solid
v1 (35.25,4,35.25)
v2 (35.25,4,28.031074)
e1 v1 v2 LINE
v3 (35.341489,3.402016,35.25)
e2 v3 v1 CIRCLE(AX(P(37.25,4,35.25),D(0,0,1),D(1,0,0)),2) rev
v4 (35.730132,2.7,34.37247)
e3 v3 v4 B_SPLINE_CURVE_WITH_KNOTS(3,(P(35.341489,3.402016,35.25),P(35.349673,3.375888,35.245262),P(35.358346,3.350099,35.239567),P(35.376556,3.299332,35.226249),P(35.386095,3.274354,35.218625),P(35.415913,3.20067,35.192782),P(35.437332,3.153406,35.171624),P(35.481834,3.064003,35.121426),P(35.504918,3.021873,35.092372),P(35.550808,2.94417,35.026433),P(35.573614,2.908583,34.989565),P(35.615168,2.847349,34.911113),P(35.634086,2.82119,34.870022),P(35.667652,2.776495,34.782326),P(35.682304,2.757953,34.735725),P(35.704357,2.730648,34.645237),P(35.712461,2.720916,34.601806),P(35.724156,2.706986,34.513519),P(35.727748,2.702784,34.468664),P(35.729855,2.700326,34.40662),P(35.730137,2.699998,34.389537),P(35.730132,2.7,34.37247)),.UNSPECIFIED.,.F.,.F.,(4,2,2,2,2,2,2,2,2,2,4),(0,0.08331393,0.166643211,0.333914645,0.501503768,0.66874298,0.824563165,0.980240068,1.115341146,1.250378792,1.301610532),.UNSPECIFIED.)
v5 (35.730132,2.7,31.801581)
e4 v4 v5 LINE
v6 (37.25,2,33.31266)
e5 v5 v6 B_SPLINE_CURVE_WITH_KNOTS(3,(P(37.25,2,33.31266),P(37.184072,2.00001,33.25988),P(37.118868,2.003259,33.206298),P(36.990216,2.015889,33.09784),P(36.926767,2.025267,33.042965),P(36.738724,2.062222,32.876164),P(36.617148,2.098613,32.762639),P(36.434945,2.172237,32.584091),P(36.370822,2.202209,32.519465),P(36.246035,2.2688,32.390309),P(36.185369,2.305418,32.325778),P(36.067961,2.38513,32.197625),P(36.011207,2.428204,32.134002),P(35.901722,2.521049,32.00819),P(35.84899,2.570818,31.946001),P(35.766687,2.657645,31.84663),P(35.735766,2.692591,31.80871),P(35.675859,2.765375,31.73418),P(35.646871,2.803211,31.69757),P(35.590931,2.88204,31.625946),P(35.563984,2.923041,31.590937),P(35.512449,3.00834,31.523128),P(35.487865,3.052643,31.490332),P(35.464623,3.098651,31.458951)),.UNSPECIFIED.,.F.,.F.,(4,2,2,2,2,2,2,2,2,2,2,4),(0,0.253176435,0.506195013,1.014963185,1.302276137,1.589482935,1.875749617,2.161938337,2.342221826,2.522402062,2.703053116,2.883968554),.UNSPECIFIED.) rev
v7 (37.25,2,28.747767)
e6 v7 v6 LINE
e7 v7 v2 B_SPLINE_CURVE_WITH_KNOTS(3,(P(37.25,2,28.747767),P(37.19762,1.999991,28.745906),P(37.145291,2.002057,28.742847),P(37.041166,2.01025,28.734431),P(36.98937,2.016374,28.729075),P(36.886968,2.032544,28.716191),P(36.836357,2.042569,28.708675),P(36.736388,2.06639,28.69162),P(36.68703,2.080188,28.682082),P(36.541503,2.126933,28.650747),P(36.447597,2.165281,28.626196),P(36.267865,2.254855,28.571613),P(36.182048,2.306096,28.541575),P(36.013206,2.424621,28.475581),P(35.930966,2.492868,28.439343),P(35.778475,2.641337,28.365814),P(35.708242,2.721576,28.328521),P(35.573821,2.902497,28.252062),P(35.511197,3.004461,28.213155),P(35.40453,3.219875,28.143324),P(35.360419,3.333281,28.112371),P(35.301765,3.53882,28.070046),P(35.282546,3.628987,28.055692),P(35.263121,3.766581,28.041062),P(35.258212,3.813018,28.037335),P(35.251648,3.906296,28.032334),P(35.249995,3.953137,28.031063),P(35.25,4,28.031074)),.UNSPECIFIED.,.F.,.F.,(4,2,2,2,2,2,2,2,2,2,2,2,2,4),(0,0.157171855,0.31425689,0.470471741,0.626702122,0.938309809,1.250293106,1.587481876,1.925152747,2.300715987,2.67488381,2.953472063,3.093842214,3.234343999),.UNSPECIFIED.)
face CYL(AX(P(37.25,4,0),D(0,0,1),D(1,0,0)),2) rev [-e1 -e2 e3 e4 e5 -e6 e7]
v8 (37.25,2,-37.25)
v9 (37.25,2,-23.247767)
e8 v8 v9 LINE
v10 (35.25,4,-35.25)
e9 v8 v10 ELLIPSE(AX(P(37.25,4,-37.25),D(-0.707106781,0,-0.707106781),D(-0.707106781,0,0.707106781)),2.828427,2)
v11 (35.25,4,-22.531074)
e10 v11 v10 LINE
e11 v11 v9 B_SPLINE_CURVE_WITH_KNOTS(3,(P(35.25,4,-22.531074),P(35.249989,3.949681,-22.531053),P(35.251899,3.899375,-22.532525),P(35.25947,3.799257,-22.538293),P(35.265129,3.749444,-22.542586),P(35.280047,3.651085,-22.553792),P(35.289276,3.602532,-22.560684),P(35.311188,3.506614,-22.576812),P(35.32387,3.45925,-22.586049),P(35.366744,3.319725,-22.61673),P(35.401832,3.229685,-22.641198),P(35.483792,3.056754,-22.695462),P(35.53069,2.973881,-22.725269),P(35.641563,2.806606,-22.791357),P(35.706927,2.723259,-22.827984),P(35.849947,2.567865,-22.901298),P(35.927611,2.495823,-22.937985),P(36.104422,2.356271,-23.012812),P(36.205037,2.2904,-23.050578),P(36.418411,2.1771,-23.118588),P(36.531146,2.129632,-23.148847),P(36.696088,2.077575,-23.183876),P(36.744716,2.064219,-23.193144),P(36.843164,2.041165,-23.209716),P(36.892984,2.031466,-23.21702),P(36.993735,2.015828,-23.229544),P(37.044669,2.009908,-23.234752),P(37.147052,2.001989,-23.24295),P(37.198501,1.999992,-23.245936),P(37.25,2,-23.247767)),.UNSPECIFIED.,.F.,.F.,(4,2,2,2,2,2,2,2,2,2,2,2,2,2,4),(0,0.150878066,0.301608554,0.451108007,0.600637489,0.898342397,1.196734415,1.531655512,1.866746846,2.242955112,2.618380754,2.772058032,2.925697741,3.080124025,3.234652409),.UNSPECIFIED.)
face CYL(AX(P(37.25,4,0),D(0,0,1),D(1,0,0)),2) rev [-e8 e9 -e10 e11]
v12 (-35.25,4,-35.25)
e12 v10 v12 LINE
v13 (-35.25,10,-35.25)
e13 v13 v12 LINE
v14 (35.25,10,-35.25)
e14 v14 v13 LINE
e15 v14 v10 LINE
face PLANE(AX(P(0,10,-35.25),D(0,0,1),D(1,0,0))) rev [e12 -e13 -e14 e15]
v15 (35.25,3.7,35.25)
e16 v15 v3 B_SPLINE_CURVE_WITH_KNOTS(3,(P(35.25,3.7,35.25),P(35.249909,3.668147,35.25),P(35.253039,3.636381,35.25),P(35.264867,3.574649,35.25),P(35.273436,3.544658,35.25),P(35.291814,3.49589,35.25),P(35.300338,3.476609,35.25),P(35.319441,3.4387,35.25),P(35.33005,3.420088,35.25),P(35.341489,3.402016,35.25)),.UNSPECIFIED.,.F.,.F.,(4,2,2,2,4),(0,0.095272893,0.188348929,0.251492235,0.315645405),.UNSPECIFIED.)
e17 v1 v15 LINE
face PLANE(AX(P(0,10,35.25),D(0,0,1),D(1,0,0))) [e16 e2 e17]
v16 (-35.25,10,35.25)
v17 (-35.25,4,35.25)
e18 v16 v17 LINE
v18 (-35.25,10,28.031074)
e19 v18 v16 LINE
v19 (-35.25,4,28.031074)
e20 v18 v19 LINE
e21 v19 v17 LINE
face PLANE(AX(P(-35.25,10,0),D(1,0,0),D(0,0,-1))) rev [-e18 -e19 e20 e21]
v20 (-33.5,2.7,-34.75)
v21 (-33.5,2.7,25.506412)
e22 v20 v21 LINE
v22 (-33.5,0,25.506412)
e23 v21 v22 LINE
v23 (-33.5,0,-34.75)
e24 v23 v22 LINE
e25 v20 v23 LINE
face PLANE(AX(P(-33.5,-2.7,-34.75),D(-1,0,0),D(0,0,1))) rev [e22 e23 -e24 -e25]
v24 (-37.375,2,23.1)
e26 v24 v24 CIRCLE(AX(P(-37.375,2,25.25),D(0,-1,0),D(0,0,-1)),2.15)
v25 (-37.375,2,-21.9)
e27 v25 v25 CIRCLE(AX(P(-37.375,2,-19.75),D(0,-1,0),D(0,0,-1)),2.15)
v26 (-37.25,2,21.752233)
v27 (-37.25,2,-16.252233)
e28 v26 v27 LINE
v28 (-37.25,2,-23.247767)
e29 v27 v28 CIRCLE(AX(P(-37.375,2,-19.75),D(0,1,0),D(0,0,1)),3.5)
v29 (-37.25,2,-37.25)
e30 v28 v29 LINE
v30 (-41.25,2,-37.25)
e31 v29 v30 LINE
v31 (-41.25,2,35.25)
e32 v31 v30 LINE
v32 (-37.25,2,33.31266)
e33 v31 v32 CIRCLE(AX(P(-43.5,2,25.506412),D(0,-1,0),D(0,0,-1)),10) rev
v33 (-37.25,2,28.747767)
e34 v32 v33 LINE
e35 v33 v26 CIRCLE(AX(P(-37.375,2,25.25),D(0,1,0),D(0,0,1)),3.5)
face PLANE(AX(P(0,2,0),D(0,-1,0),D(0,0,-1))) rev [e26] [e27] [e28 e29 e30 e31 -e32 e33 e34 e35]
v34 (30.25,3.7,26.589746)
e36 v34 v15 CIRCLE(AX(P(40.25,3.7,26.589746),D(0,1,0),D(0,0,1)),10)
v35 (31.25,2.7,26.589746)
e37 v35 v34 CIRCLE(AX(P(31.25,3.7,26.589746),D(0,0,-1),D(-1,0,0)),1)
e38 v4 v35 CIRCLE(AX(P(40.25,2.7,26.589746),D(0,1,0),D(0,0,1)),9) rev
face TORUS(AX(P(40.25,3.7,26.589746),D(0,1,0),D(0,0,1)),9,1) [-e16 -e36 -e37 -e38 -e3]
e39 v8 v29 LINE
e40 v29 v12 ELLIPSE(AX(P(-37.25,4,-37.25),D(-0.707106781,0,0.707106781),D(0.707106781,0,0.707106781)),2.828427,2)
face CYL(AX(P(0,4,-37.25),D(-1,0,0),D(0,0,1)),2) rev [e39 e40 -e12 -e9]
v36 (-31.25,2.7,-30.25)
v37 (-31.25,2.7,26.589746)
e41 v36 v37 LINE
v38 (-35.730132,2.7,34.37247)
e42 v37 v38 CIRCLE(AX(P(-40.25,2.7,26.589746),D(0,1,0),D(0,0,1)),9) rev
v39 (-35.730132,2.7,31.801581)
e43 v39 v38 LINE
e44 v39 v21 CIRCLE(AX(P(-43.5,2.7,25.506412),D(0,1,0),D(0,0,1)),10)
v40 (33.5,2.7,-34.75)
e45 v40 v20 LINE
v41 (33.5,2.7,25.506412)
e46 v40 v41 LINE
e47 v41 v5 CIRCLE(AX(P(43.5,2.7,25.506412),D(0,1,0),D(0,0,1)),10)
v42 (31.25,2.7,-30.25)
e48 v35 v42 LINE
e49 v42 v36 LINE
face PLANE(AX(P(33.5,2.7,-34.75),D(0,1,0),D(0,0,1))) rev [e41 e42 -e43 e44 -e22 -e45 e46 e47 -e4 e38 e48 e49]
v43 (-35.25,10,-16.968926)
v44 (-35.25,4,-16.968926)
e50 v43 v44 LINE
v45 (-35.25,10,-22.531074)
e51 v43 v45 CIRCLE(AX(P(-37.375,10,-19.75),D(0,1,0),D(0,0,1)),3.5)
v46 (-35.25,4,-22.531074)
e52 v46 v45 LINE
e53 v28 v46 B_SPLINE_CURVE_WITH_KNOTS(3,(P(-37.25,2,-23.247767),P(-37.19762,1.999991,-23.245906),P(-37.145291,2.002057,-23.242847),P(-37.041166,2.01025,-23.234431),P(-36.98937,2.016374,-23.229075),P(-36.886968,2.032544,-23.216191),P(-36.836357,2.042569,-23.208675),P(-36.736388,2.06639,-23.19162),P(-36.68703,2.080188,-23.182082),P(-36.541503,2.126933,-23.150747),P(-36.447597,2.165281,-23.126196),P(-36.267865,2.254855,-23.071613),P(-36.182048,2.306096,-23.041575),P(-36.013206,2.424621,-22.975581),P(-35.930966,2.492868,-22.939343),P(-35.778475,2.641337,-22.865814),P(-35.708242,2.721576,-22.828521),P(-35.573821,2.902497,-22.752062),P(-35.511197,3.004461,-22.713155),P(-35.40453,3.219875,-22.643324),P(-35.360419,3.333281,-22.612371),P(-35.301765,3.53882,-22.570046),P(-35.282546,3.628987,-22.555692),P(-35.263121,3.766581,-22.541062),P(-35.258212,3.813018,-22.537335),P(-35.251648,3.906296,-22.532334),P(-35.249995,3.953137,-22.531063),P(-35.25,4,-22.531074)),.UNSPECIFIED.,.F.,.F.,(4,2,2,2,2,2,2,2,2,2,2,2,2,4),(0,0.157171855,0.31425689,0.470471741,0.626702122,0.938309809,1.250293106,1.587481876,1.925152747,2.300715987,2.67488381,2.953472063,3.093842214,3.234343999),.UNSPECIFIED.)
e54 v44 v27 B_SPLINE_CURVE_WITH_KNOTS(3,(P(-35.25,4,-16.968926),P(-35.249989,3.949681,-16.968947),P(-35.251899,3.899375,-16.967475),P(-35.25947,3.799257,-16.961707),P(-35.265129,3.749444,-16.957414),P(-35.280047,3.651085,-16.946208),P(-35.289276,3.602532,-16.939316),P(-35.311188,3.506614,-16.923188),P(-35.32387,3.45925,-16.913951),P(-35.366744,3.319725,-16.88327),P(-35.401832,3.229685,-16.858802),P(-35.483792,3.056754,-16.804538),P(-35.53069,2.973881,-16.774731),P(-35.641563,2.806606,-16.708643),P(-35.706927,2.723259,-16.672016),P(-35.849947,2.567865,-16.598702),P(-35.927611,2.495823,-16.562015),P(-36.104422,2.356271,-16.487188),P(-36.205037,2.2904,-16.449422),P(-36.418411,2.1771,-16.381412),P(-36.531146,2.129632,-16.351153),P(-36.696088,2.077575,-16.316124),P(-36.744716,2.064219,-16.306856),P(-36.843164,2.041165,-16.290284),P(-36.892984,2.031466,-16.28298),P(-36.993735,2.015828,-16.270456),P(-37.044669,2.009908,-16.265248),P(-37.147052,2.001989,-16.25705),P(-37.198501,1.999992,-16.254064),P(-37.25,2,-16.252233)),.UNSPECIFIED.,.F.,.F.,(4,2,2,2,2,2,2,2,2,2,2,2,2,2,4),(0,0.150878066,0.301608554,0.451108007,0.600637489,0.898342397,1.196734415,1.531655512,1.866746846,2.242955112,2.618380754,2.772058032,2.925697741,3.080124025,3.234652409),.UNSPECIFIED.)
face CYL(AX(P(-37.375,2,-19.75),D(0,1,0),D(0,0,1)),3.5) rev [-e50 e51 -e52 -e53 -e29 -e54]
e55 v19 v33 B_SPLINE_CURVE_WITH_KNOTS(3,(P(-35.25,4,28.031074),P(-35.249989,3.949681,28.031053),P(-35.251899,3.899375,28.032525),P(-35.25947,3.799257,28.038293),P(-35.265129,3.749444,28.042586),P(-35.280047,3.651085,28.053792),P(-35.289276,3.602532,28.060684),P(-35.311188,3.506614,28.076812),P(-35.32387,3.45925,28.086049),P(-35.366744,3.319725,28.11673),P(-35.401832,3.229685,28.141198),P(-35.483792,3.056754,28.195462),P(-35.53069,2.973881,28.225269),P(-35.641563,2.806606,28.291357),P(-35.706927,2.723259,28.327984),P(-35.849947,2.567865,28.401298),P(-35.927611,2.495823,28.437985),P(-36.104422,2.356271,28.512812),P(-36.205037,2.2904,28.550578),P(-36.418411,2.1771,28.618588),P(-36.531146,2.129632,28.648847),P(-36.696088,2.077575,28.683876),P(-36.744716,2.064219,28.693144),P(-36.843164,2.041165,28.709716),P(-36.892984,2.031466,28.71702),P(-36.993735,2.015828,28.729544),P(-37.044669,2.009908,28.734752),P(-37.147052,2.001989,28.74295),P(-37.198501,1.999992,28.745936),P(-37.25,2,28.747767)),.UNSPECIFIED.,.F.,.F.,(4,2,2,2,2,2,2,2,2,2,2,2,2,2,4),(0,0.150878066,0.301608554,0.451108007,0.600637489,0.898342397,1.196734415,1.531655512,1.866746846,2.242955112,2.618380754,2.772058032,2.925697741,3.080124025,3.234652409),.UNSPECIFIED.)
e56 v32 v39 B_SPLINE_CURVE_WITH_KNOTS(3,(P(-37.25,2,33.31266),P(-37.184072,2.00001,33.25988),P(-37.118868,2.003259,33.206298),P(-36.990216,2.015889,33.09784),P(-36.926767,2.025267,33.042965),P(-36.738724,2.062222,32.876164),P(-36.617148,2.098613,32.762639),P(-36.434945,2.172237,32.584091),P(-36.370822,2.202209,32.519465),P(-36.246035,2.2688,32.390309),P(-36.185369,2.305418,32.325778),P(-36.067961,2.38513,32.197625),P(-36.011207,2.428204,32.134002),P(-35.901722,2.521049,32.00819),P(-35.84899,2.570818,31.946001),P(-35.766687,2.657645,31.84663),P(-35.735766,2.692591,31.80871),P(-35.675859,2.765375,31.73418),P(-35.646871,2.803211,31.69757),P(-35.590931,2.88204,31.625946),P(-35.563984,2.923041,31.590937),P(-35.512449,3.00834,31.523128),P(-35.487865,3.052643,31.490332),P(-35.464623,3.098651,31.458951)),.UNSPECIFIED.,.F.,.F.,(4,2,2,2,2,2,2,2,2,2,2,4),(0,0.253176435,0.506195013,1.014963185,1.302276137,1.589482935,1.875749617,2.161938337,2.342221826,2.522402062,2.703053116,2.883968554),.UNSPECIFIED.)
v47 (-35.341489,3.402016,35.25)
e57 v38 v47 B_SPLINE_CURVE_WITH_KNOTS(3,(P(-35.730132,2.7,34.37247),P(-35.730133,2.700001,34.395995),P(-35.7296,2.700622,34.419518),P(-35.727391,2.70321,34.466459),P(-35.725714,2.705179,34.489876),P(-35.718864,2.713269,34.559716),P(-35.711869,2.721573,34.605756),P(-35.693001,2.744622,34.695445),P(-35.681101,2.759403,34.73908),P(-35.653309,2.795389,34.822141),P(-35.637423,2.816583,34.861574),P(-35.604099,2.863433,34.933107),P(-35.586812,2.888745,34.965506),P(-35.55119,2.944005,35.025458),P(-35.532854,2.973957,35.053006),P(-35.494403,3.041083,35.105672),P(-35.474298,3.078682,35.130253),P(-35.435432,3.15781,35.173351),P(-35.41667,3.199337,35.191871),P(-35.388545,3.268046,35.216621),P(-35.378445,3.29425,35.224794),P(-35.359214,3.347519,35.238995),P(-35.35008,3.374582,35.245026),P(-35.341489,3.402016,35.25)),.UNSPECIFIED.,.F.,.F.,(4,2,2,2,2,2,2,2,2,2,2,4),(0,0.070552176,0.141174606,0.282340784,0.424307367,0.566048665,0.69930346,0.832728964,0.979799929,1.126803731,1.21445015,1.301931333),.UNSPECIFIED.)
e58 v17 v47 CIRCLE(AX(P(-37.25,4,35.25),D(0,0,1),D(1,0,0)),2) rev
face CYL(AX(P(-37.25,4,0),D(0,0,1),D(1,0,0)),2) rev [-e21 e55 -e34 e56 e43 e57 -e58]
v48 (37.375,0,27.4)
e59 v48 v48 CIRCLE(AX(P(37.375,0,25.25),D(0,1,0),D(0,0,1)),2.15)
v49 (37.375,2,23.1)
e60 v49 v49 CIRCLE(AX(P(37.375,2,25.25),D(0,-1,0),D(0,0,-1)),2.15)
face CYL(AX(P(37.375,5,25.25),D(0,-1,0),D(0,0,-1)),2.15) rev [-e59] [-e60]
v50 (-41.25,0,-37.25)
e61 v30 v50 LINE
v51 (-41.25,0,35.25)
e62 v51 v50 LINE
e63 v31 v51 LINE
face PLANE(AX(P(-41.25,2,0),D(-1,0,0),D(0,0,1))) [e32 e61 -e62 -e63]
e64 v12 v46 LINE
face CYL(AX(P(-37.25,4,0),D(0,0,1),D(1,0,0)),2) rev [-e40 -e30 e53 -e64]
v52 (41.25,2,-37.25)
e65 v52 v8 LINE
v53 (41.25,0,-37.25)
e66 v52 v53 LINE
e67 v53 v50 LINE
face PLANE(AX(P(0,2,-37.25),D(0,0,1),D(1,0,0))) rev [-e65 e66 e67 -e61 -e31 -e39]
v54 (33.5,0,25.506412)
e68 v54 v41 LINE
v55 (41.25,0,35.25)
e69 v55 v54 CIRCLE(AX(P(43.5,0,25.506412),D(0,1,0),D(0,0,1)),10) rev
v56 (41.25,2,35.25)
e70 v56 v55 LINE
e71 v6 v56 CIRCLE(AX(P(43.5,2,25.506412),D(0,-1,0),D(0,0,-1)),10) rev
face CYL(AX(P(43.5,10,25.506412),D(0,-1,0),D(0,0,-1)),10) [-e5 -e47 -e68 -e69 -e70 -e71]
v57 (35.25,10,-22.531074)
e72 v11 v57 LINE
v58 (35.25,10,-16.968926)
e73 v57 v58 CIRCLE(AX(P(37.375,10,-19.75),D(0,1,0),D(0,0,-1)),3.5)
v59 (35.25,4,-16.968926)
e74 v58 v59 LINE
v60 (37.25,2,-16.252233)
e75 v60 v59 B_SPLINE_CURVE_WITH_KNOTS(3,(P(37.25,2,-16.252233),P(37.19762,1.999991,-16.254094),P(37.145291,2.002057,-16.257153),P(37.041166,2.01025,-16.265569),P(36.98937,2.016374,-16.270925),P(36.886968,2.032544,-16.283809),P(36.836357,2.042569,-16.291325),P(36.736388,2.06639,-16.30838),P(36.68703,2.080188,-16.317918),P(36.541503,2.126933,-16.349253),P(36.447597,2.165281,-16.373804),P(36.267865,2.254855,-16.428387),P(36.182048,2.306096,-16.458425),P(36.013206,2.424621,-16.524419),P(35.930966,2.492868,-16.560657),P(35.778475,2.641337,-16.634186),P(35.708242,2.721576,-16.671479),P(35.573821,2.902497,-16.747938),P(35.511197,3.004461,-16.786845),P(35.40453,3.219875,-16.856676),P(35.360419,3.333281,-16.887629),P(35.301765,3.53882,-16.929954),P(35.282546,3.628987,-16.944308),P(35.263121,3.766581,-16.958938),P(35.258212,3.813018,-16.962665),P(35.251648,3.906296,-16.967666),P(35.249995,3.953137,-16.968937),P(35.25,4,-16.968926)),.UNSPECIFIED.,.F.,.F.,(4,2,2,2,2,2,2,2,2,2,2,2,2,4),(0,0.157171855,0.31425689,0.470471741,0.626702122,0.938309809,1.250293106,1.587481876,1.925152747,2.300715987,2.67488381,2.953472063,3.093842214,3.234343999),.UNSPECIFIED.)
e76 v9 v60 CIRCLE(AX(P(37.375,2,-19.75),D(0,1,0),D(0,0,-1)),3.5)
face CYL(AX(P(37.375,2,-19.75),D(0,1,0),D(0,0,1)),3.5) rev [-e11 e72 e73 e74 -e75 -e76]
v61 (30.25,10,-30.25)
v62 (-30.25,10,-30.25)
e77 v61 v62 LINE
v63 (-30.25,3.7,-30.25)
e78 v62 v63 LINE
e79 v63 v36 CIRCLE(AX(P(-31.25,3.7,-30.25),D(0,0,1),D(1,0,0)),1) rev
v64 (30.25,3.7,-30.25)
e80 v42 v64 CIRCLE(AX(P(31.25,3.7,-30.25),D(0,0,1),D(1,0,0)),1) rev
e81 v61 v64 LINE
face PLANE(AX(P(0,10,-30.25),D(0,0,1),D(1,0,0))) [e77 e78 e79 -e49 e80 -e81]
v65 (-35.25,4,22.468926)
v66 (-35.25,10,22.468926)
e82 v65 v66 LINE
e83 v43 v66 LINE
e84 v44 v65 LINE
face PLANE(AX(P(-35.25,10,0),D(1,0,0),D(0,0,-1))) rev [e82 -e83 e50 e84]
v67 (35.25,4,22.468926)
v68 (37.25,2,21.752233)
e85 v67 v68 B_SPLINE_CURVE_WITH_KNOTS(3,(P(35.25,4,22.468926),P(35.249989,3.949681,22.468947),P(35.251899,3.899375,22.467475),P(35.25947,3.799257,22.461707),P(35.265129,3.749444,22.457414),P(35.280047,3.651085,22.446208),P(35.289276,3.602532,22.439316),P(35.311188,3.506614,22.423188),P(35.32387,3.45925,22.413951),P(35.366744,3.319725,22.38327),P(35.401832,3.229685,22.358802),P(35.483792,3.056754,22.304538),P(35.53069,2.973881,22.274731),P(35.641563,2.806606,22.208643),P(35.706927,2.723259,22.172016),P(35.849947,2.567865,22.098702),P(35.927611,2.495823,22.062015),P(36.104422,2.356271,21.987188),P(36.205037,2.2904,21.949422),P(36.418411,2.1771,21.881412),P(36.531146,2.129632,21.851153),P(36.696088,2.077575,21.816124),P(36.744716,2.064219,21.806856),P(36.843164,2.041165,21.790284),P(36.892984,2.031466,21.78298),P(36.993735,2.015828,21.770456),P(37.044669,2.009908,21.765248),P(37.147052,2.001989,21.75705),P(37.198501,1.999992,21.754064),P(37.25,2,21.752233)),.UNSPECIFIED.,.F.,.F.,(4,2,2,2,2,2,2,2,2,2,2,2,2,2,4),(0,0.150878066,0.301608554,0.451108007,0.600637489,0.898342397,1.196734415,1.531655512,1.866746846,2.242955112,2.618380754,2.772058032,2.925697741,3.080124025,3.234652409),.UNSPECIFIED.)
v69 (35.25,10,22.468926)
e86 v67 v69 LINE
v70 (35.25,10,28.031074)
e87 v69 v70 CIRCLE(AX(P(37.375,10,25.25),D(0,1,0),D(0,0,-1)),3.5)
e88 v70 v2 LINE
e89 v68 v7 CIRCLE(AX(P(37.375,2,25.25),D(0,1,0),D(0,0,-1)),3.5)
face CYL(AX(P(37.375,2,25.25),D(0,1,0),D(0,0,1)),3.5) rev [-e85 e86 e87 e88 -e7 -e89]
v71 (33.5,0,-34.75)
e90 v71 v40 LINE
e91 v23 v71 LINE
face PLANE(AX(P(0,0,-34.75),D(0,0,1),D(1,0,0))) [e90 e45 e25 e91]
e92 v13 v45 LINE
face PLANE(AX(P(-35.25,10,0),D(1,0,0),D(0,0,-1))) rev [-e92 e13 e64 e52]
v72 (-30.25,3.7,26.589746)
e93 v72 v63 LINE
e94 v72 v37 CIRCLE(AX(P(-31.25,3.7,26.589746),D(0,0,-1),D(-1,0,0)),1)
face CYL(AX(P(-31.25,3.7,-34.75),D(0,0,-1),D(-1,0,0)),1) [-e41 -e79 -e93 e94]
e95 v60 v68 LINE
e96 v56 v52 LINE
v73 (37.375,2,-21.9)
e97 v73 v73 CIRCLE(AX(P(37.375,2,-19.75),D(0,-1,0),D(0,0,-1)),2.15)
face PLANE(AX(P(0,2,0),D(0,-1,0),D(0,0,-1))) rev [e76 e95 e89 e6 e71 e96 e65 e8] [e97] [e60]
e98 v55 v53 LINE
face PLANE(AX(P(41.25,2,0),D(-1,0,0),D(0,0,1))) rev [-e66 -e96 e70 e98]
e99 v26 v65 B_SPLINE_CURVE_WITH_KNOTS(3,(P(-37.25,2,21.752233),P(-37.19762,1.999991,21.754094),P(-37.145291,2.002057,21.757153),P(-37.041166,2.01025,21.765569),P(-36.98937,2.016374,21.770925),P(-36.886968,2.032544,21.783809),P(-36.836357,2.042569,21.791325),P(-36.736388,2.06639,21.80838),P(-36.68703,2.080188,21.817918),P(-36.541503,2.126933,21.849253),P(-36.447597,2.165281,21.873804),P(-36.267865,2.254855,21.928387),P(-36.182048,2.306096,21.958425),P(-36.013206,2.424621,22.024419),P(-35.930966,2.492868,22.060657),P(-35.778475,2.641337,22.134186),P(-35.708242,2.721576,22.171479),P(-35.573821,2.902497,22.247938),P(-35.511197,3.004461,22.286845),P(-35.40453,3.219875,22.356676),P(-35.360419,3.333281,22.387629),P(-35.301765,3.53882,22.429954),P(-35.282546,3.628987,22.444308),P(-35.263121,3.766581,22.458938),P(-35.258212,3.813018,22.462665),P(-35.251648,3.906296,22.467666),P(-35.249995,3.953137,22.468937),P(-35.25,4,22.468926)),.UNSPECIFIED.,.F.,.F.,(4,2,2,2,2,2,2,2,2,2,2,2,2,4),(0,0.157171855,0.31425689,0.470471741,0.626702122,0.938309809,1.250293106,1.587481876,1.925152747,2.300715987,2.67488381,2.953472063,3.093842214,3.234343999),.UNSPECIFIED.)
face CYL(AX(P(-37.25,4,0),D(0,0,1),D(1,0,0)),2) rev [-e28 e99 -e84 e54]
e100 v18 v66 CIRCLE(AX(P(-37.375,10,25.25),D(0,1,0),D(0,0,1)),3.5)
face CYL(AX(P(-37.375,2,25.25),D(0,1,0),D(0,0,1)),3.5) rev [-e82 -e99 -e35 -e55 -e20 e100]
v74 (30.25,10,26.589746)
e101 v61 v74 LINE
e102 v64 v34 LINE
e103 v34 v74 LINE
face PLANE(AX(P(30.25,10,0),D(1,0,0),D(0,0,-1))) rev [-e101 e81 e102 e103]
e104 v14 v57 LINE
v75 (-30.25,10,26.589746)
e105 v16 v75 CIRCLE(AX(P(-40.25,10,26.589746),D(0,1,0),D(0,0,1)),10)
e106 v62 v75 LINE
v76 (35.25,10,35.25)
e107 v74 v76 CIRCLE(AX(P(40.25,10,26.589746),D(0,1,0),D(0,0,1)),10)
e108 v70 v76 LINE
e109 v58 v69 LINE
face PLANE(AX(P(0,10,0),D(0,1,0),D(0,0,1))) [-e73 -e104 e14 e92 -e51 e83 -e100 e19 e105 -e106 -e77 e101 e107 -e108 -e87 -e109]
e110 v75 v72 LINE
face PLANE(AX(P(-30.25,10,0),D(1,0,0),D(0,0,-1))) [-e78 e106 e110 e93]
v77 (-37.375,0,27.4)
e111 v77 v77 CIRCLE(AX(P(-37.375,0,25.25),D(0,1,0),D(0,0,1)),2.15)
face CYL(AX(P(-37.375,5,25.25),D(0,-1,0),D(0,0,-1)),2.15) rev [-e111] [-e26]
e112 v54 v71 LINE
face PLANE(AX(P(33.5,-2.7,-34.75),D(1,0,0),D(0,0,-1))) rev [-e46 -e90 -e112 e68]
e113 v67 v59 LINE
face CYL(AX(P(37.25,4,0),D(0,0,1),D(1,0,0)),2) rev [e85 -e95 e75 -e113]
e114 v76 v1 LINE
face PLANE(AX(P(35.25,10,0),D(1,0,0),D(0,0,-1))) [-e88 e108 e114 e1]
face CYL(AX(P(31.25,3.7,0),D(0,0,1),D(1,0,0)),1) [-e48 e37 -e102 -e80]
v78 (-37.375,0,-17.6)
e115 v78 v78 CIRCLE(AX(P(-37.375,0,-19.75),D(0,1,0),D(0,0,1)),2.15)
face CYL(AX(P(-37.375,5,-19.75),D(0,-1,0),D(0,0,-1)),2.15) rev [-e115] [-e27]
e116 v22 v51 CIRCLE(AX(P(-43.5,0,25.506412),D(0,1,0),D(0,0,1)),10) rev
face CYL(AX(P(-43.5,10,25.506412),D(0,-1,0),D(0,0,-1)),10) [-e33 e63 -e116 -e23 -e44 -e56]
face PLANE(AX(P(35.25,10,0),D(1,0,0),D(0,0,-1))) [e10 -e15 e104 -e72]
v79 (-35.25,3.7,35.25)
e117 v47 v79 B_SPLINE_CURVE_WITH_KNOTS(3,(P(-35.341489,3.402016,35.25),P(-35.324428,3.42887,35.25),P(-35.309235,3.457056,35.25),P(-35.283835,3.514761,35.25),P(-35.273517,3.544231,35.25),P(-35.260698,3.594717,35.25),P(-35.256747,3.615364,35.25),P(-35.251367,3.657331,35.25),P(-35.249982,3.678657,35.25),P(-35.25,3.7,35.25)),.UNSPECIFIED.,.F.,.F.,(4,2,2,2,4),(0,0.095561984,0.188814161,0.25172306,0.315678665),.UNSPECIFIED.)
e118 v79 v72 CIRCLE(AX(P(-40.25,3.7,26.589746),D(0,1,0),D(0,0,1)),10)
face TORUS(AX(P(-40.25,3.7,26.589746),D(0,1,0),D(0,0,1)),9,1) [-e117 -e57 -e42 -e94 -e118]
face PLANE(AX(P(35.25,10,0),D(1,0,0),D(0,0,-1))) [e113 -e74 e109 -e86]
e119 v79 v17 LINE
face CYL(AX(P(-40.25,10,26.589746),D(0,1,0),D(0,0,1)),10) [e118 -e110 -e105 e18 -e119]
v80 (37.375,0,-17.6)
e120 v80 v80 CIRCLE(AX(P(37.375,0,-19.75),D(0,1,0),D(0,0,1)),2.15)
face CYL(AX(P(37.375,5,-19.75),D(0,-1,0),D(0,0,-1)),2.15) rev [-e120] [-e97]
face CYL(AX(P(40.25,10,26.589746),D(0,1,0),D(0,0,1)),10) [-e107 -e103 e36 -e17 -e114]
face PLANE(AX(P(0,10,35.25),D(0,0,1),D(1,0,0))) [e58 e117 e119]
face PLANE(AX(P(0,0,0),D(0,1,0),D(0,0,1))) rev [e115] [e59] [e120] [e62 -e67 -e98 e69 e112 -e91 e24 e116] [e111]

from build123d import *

# Parameters (mm, degrees)
SKETCH1_W           = 70.5
SKETCH1_H           = 70.5
SKETCH1_W_2         = 60.5
SKETCH1_H_2         = 60.5
BOSS_EXTRUDE1_DEPTH = 10
SKETCH2_W           = 67
SKETCH2_H           = 5.4
CUT_EXTRUDE1_DEPTH  = 70
BOSS_EXTRUDE3_DEPTH = 2
SKETCH7_W           = 60.5
SKETCH7_H           = 5
CUT_EXTRUDE3_DEPTH  = 25
FILLET2_R           = 2
SKETCH8_W           = 97.382964501
SKETCH8_H           = 35.083557697
CUT_EXTRUDE4_DEPTH  = 2
SKETCH9_R           = 2.15
CUT_EXTRUDE5_DEPTH  = 5
SKETCH10_R          = 3.5
CUT_EXTRUDE6_DEPTH  = 8
FILLET3_R           = 10
FILLET4_R           = 10
FILLET5_R           = 1


# Some blends are built 0.0001 mm under size
with BuildPart() as part:
    # Sketch1 → Boss-Extrude1 (new body)
    with BuildSketch(Plane(origin=(0, 0, 0), x_dir=(1, 0, 0), z_dir=(0, 1, 0))):
        Rectangle(SKETCH1_W, SKETCH1_H)
        Rectangle(SKETCH1_W_2, SKETCH1_H_2, mode=Mode.SUBTRACT)
    extrude(amount=BOSS_EXTRUDE1_DEPTH)

    # Sketch2 → Cut-Extrude1 (cut)
    with BuildSketch(Plane.XY.offset(35.25)):
        Rectangle(SKETCH2_W, SKETCH2_H)
    extrude(amount=-CUT_EXTRUDE1_DEPTH, mode=Mode.SUBTRACT)

    # Sketch6 → Boss-Extrude3 (add)
    with BuildSketch(Plane.XZ):
        Polygon((41.25, -37.25), (41.25, 37.25), (35.25, 37.25), (35.25, 35.25), (35.25, -35.25), (-35.25, -35.25), (-35.25, 35.25), (-35.25, 37.25), (-41.25, 37.25), (-41.25, -37.25), align=None)
    extrude(amount=-BOSS_EXTRUDE3_DEPTH)

    # Sketch7 → Cut-Extrude3 (cut)
    with BuildSketch(Plane.XZ.offset(-2.7)):
        with Locations((0, 32.75)):
            Rectangle(SKETCH7_W, SKETCH7_H)
    extrude(amount=-CUT_EXTRUDE3_DEPTH, mode=Mode.SUBTRACT)

    # Fillet2
    fillet2_edges = [part.edges().sort_by_distance(p)[0] for p in [
        (35.25, 2, 0),
        (-35.25, 2, 0),
        (0, 2, -35.25),
    ]]
    fillet(fillet2_edges, radius=FILLET2_R - 0.0001)  # a hair under: the kernel refuses the full size

    # Sketch8 → Cut-Extrude4 (cut)
    with BuildSketch(Plane.XY.offset(37.25)):
        with Locations((-5.820498703, 2.430952297)):
            Rectangle(SKETCH8_W, SKETCH8_H)
    extrude(amount=-CUT_EXTRUDE4_DEPTH, mode=Mode.SUBTRACT)

    # Sketch9 → Cut-Extrude5 (cut, symmetric)
    with BuildSketch(Plane.XZ):
        with Locations(Location((-37.375, 25.25, 0), (0, 0, 273.333029494))):
            Circle(SKETCH9_R)
        with Locations(Location((-37.375, -19.75, 0), (0, 0, 273.333029494))):
            Circle(SKETCH9_R)
        with Locations(Location((37.375, -19.75, 0), (0, 0, 266.666970506))):
            Circle(SKETCH9_R)
        with Locations(Location((37.375, 25.25, 0), (0, 0, 266.666970506))):
            Circle(SKETCH9_R)
    extrude(amount=CUT_EXTRUDE5_DEPTH, both=True, mode=Mode.SUBTRACT)

    # Sketch10 → Cut-Extrude6 (cut)
    with BuildSketch(Plane(origin=(0, 10, 0), x_dir=(1, 0, 0), z_dir=(0, 1, 0))):
        with Locations((-37.375, 19.75)):
            Circle(SKETCH10_R)
        with Locations((-37.375, -25.25)):
            Circle(SKETCH10_R)
        with Locations((37.375, -25.25)):
            Circle(SKETCH10_R)
        with Locations((37.375, 19.75)):
            Circle(SKETCH10_R)
    extrude(amount=-CUT_EXTRUDE6_DEPTH, mode=Mode.SUBTRACT)

    # Fillet3
    # the kernel refuses this fillet: 10 mm, written as the material it takes off along each edge
    with BuildSketch(Plane(origin=(-33.5, -24.358969087, 35.25), x_dir=(0, 0, -1), z_dir=(0, 1, 0)), Plane(origin=(33.5, 2.7, 35.25), x_dir=(0, 0, -1), z_dir=(0, -1, 0))) as fillet3_piece_1:
        with BuildLine():
            CenterArc((9.743587635, 10), FILLET3_R, 193.002878163, 76.997121837)
            Line((0, 7.75), (0, 0))
            Line((0, 0), (9.743587635, 0))
        make_face()
    extrude(amount=27.058969087, mode=Mode.SUBTRACT)

    # Fillet4
    # the kernel refuses this fillet: 10 mm, written as the material it takes off along each edge
    with BuildSketch(Plane(origin=(30.25, -18.950635095, 35.25), x_dir=(0, 0, -1), z_dir=(0, 1, 0))) as fillet4_piece_1:
        with BuildLine():
            CenterArc((8.660254038, -10), FILLET4_R, 90, 60)
            Line((0, -5), (-0.173205081, -4.9))
            ThreePointArc((-0.173205081, -4.9), (-0.2, -2.5), (-0.2, 0))
            Line((-0.2, 0), (0, 0.2))
            Line((0, 0.2), (8.660254038, 0.2))
            Line((8.660254038, 0.2), (8.660254038, 0))
        make_face()
    extrude(amount=50.601270189, mode=Mode.SUBTRACT)
    with BuildSketch(Plane(origin=(-30.25, -18.950635095, 35.25), x_dir=(0, 0, -1), z_dir=(0, 1, 0))) as fillet4_piece_2:
        with BuildLine():
            CenterArc((8.660254038, 10), FILLET4_R, 210, 60)
            Line((0, 5), (-0.173205081, 4.9))
            ThreePointArc((-0.173205081, 4.9), (-0.2, 2.5), (-0.2, 0))
            Line((-0.2, 0), (0, -0.2))
            Line((0, -0.2), (8.660254038, -0.2))
            Line((8.660254038, -0.2), (8.660254038, 0))
        make_face()
    extrude(amount=50.601270189, mode=Mode.SUBTRACT)

    # Fillet5
    # the kernel refuses this fillet: 1 mm, written as the material it takes off along each edge
    with BuildSketch(Plane(origin=(30.25, 2.7, 26.589745962), x_dir=(1, 0, 0), z_dir=(0, 0, -1)), Plane(origin=(-30.25, 2.7, -30.25), x_dir=(-1, 0, 0), z_dir=(0, 0, 1))) as fillet5_piece_1:
        with BuildLine():
            CenterArc((FILLET5_R, -FILLET5_R), FILLET5_R, 90, 90)
            Line((0, -FILLET5_R), (0, 0))
            Line((0, 0), (FILLET5_R, 0))
        make_face()
    extrude(amount=56.839745962, mode=Mode.SUBTRACT)
    with BuildSketch(Plane(origin=(40.25, 2.7, 26.589745962), x_dir=(-0.27015512952929444, 0, 0.9628168081151316), z_dir=(0.9628168081151316, 0, 0.27015512952929444))) as fillet5_piece_2:
        with BuildLine():
            CenterArc((10 - FILLET5_R, -FILLET5_R), FILLET5_R, 0, 90)
            Line((10 - FILLET5_R, 0), (10, 0))
            Line((10, 0), (10, -FILLET5_R))
        make_face()
    revolve(axis=Axis((40.25, 2.7, 26.589745962), (0, -1, 0)), revolution_arc=74.326501832, mode=Mode.SUBTRACT)
    with BuildSketch(Plane(origin=(-40.25, 2.7, 26.589745962), x_dir=(1, 0, 0), z_dir=(0, 0, -1))) as fillet5_piece_3:
        with BuildLine():
            CenterArc((10 - FILLET5_R, -FILLET5_R), FILLET5_R, 0, 90)
            Line((10, -FILLET5_R), (10, 0))
            Line((10, 0), (10 - FILLET5_R, 0))
        make_face()
    revolve(axis=Axis((-40.25, 2.7, 26.589745962), (0, -1, 0)), revolution_arc=74.326501832, mode=Mode.SUBTRACT)


solid = part.part
